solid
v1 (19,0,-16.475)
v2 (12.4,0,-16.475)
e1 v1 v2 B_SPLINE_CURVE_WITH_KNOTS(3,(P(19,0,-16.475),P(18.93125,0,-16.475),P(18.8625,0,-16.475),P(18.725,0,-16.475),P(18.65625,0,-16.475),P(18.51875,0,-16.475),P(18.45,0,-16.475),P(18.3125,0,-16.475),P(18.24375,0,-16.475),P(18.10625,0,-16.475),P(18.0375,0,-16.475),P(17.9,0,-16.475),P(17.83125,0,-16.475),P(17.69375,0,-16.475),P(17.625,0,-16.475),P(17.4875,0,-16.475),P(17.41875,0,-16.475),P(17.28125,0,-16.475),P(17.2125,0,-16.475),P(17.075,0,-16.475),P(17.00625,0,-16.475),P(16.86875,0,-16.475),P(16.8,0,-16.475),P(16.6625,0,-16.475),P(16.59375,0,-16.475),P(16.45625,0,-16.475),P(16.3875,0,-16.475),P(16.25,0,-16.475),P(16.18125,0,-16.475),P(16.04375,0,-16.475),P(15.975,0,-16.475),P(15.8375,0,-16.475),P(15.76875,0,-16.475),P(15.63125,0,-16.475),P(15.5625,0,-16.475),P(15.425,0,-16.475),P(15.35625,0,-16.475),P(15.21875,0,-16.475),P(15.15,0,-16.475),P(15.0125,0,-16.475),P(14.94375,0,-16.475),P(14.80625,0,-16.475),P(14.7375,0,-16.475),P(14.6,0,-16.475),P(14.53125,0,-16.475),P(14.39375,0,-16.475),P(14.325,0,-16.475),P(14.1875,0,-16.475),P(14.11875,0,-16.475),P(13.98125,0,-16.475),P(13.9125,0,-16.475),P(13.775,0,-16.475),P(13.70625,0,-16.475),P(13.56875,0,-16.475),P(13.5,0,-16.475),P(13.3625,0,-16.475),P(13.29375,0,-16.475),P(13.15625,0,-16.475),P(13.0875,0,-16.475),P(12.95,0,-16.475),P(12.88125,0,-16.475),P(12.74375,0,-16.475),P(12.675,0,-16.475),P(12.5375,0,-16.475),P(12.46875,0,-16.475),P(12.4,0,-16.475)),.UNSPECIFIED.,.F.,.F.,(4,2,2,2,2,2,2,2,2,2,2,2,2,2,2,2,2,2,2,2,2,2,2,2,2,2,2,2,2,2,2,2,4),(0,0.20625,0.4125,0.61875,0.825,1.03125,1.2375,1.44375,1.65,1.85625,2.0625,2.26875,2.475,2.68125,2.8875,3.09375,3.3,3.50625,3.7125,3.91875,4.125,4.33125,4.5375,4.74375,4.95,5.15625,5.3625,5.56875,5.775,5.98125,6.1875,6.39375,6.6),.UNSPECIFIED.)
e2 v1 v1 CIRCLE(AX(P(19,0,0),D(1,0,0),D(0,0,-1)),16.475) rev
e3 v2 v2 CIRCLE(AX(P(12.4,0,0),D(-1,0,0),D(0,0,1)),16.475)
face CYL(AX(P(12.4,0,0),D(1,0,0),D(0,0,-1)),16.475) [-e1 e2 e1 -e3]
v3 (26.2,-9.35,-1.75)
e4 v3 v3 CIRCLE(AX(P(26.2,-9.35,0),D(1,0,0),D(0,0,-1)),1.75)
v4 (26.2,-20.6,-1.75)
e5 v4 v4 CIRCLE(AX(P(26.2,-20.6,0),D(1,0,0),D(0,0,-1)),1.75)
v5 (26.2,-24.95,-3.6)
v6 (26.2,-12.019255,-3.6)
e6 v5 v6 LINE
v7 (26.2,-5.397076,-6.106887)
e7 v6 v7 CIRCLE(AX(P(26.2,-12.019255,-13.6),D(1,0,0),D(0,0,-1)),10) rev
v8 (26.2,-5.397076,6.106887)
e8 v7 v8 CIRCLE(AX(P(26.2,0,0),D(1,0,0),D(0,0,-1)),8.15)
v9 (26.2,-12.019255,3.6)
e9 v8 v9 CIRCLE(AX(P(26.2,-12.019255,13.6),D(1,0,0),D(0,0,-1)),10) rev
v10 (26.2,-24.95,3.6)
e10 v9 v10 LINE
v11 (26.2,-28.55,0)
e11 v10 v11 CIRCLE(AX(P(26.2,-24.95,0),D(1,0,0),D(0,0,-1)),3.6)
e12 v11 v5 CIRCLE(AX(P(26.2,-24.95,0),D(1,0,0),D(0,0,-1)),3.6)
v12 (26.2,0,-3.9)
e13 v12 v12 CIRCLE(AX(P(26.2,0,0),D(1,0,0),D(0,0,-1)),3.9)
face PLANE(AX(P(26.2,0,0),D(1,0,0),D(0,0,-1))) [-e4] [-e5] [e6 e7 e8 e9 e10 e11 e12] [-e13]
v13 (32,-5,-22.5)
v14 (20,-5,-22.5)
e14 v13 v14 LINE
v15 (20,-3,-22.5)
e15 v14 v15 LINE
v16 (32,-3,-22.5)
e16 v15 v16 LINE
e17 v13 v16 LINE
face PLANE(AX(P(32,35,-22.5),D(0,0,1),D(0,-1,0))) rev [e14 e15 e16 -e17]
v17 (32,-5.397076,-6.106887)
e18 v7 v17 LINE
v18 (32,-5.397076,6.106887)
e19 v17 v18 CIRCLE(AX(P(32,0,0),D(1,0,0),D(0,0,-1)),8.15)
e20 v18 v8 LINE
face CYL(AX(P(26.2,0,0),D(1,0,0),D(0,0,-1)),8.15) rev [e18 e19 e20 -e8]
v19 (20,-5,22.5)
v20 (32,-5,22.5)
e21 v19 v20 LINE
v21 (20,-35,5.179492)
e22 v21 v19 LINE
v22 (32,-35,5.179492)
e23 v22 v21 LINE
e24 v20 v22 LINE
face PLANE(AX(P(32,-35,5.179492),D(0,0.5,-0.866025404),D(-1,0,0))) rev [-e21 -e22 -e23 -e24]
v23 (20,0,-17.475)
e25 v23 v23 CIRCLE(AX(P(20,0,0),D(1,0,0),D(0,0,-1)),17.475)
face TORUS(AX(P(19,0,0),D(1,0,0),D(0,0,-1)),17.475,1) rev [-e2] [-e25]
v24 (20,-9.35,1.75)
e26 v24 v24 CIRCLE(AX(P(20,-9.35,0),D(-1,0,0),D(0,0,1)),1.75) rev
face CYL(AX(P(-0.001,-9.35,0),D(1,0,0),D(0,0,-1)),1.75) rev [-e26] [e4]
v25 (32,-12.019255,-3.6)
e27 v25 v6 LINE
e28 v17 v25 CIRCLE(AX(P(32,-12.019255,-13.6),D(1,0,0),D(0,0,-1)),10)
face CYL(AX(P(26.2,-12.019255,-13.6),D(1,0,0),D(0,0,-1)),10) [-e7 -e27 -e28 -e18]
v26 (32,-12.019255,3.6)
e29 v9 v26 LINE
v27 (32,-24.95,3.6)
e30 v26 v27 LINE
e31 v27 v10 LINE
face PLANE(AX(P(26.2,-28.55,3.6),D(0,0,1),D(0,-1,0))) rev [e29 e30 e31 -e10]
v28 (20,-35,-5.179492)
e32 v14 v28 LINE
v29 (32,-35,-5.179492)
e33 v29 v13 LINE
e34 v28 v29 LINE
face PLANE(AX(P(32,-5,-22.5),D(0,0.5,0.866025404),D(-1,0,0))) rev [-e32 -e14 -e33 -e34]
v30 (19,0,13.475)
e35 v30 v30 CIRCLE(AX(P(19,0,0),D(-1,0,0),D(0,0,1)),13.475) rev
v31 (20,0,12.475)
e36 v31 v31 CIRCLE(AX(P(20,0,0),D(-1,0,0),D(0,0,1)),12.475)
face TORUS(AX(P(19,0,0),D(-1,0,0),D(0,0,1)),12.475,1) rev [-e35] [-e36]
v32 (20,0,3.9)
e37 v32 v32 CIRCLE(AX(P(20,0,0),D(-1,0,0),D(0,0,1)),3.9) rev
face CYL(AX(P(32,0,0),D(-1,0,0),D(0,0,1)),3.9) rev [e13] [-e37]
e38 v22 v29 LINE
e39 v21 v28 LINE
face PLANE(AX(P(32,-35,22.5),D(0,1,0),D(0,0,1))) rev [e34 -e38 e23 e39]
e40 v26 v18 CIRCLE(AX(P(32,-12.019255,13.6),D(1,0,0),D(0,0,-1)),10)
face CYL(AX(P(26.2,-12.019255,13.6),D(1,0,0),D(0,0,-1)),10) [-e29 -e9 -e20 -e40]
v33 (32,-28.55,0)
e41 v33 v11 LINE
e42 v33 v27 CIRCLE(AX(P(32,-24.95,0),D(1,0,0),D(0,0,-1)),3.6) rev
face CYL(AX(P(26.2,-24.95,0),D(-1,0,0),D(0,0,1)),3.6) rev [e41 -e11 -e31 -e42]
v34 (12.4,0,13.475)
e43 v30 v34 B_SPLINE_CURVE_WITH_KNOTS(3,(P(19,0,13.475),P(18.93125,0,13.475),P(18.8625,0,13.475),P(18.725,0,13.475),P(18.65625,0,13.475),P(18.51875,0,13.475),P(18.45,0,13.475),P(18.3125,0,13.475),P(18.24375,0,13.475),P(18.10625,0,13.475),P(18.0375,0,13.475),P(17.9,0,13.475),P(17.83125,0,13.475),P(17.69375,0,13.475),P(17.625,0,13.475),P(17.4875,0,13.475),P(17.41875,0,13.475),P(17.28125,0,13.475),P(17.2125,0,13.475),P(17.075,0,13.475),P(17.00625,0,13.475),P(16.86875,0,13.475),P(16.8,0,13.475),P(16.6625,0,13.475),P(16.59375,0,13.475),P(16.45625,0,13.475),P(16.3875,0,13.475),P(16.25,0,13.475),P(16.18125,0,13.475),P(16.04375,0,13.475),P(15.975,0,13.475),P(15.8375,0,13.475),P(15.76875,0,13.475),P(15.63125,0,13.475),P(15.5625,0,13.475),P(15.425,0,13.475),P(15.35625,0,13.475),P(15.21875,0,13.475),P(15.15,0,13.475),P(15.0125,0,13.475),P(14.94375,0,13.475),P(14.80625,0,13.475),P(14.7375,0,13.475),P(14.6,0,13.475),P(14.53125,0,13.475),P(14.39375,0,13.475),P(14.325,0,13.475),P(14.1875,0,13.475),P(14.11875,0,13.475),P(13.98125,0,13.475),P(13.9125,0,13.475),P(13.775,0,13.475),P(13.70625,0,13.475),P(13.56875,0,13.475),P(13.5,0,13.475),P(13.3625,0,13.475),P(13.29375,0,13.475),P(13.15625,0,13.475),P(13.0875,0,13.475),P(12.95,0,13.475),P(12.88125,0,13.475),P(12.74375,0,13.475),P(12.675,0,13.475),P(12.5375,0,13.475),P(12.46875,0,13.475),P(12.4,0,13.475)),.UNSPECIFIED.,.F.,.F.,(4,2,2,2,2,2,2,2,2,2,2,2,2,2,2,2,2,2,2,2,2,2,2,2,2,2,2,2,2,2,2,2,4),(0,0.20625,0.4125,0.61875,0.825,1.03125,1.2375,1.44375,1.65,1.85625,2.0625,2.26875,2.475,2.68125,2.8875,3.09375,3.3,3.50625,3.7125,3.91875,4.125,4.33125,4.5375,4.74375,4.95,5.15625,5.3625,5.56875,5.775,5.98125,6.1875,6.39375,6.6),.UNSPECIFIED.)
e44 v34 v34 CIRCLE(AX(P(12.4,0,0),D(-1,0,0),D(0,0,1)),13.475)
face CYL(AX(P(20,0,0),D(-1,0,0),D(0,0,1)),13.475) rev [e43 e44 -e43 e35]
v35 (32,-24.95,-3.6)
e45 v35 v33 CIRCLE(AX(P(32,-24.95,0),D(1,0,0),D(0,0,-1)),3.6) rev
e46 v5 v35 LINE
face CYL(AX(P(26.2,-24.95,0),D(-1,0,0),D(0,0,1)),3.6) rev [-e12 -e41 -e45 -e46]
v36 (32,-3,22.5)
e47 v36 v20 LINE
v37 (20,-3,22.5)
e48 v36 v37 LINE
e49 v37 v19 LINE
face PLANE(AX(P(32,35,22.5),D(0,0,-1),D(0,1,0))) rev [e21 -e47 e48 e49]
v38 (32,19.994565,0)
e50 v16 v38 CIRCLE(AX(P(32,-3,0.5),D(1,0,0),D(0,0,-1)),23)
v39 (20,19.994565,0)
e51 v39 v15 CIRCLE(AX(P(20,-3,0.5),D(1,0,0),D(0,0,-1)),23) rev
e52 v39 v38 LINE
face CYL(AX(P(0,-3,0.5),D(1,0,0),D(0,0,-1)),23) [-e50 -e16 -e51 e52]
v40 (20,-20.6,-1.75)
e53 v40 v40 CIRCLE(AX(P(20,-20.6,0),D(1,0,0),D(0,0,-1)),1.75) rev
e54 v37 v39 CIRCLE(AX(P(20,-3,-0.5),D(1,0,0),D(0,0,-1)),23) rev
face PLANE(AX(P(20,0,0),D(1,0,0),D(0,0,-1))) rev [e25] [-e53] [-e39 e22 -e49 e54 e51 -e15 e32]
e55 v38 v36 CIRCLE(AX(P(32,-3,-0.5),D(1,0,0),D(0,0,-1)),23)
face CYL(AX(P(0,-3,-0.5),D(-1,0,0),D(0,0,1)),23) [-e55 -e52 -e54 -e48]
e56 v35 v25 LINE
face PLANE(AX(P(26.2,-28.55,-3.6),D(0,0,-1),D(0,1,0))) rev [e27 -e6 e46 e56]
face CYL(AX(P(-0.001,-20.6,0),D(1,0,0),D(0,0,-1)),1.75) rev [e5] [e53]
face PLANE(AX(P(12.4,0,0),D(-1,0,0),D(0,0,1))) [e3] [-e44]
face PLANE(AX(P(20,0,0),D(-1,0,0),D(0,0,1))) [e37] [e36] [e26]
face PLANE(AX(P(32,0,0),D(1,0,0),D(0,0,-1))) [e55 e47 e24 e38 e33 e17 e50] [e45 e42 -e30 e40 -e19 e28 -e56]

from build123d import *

# Parameters (mm, degrees)
SKETCH1_W           = 20
SKETCH1_H           = 20
BOSS_EXTRUDE1_DEPTH = 20
SKETCH2_W           = 45
SKETCH2_H           = 70
BOSS_EXTRUDE2_DEPTH = 12
CUT_EXTRUDE1_DEPTH  = 5.8
FILLET1_R           = 3.6
FILLET2_R           = 10
SKETCH5_R           = 3.9
CUT_EXTRUDE2_DEPTH  = 53.490475326
CUT_EXTRUDE3_REACH  = 51.17
SKETCH6_R           = 1.75
SKETCH13_W          = 20
SKETCH13_H          = 20
CUT_EXTRUDE9_DEPTH  = 20
SKETCH14_R          = 16.475
BOSS_EXTRUDE3_DEPTH = 7.6
SKETCH15_W          = 12
SKETCH15_H          = 45
CUT_EXTRUDE10_DEPTH = 15
FILLET3_R           = 23
CHAMFER1_SIZE       = 30
CHAMFER1_SIZE2      = 17.320508076
CHAMFER2_SIZE       = 30
CHAMFER2_SIZE2      = 17.320508076
SKETCH16_R          = 13.475
CUT_EXTRUDE11_DEPTH = 7.6
FILLET4_R           = 1


# Some blends are built 0.0001 mm under size
with BuildPart() as part:
    # Sketch1 → Boss-Extrude1 (new body)
    with BuildSketch(Plane(origin=(0, 0, 0), x_dir=(0, 0, -1), z_dir=(1, 0, 0))):
        Rectangle(SKETCH1_W, SKETCH1_H)
    extrude(amount=BOSS_EXTRUDE1_DEPTH)

    # Sketch2 → Boss-Extrude2 (add)
    with BuildSketch(Plane(origin=(20, 0, 0), x_dir=(0, 0, -1), z_dir=(1, 0, 0))):
        Rectangle(SKETCH2_W, SKETCH2_H)
    extrude(amount=BOSS_EXTRUDE2_DEPTH)

    # Sketch4 → Cut-Extrude1 (cut)
    with BuildSketch(Plane(origin=(32, 0, 0), x_dir=(0, 0, -1), z_dir=(1, 0, 0))):
        with BuildLine():
            Line((3.6, -28.55), (-3.6, -28.55))
            Line((-3.6, -28.55), (-3.6, -7.311805523))
            ThreePointArc((-3.6, -7.311805523), (0, 8.15), (3.6, -7.311805523))
            Line((3.6, -7.311805523), (3.6, -28.55))
        make_face()
    extrude(amount=-CUT_EXTRUDE1_DEPTH, mode=Mode.SUBTRACT)

    # Fillet1
    fillet1_edges = [part.edges().sort_by_distance(p)[0] for p in [
        (29.1, -28.55, 3.6),
        (29.1, -28.55, -3.6),
    ]]
    fillet(fillet1_edges, radius=FILLET1_R - 0.0001)  # a hair under: the kernel refuses the full size

    # Fillet2
    fillet2_edges = [part.edges().sort_by_distance(p)[0] for p in [
        (29.1, -7.311805523, 3.6),
        (29.1, -7.311805523, -3.6),
    ]]
    fillet(fillet2_edges, radius=FILLET2_R)

    # Sketch5 → Cut-Extrude2 (cut, through all)
    with BuildSketch(Plane.ZY):
        Circle(SKETCH5_R)
    extrude(amount=-CUT_EXTRUDE2_DEPTH, mode=Mode.SUBTRACT)

    # Sketch6 → Cut-Extrude3 (cut, up to next)
    with BuildSketch(Plane(origin=(26.2, 0, 0), x_dir=(0, 0, -1), z_dir=(1, 0, 0)), mode=Mode.PRIVATE) as cut_extrude3_sk1:
        with Locations((0, -20.6)):
            Circle(SKETCH6_R)
    cut_extrude3_tool1 = extrude(cut_extrude3_sk1.sketch, amount=-CUT_EXTRUDE3_REACH, mode=Mode.PRIVATE) & part.part
    # Sketch6 → Cut-Extrude3 (cut, up to next)
    with BuildSketch(Plane(origin=(26.2, 0, 0), x_dir=(0, 0, -1), z_dir=(1, 0, 0)), mode=Mode.PRIVATE) as cut_extrude3_sk2:
        with Locations((0, -9.35)):
            Circle(SKETCH6_R)
    cut_extrude3_tool2 = extrude(cut_extrude3_sk2.sketch, amount=-CUT_EXTRUDE3_REACH, mode=Mode.PRIVATE) & part.part
    add(cut_extrude3_tool1.solids().sort_by_distance((26.2, -20.6, 0))[0], mode=Mode.SUBTRACT)
    add(cut_extrude3_tool2.solids().sort_by_distance((26.2, -9.35, 0))[0], mode=Mode.SUBTRACT)

    # Sketch13 → Cut-Extrude9 (cut)
    with BuildSketch(Plane.ZY):
        Rectangle(SKETCH13_W, SKETCH13_H)
    extrude(amount=-CUT_EXTRUDE9_DEPTH, mode=Mode.SUBTRACT)

    # Sketch14 → Boss-Extrude3 (add)
    with BuildSketch(Plane.ZY.offset(-20)):
        with Locations(Location((0, 0, 0), (0, 0, 180))):
            Circle(SKETCH14_R)
    extrude(amount=BOSS_EXTRUDE3_DEPTH)

    # Sketch15 → Cut-Extrude10 (cut)
    with BuildSketch(Plane(origin=(0, 35, 0), x_dir=(1, 0, 0), z_dir=(0, 1, 0))):
        with Locations((26, 0)):
            Rectangle(SKETCH15_W, SKETCH15_H)
    extrude(amount=-CUT_EXTRUDE10_DEPTH, mode=Mode.SUBTRACT)

    # Fillet3
    # the kernel refuses this fillet: 23 mm, written as the material it takes off along each edge
    with BuildSketch(Plane(origin=(-37.5, 20, -22.5), x_dir=(0, -1, 0), z_dir=(1, 0, 0)), Plane(origin=(89.5, 20, 22.5), x_dir=(0, -1, 0), z_dir=(-1, 0, 0))) as fillet3_piece_1:
        with BuildLine():
            CenterArc((FILLET3_R, -FILLET3_R), FILLET3_R, 90, 90)
            Line((0, -FILLET3_R), (0, 0))
            Line((0, 0), (FILLET3_R, 0))
        make_face()
    extrude(amount=127, mode=Mode.SUBTRACT)

    # Chamfer1
    chamfer1_edges = [part.edges().sort_by_distance(p)[0] for p in [
        (26, -35, 22.5),
    ]]
    chamfer1_side = [part.faces().sort_by_distance(p)[0] for p in [
        (26, -19, 22.5),
    ]]
    chamfer(chamfer1_edges, length=CHAMFER1_SIZE, length2=CHAMFER1_SIZE2, reference=chamfer1_side[0])

    # Chamfer2
    chamfer2_edges = [part.edges().sort_by_distance(p)[0] for p in [
        (26, -35, -22.5),
    ]]
    chamfer2_side = [part.faces().sort_by_distance(p)[0] for p in [
        (26, -19, -22.5),
    ]]
    chamfer(chamfer2_edges, length=CHAMFER2_SIZE, length2=CHAMFER2_SIZE2, reference=chamfer2_side[0])

    # Sketch16 → Cut-Extrude11 (cut)
    with BuildSketch(Plane.ZY.offset(-12.4)):
        Circle(SKETCH16_R)
    extrude(amount=-CUT_EXTRUDE11_DEPTH, mode=Mode.SUBTRACT)

    # Fillet4
    fillet4_edges = [part.edges().sort_by_distance(p)[0] for p in [
        (20, 0, 16.475),
        (20, 0, -13.475),
    ]]
    fillet(fillet4_edges, radius=FILLET4_R)


solid = part.part
